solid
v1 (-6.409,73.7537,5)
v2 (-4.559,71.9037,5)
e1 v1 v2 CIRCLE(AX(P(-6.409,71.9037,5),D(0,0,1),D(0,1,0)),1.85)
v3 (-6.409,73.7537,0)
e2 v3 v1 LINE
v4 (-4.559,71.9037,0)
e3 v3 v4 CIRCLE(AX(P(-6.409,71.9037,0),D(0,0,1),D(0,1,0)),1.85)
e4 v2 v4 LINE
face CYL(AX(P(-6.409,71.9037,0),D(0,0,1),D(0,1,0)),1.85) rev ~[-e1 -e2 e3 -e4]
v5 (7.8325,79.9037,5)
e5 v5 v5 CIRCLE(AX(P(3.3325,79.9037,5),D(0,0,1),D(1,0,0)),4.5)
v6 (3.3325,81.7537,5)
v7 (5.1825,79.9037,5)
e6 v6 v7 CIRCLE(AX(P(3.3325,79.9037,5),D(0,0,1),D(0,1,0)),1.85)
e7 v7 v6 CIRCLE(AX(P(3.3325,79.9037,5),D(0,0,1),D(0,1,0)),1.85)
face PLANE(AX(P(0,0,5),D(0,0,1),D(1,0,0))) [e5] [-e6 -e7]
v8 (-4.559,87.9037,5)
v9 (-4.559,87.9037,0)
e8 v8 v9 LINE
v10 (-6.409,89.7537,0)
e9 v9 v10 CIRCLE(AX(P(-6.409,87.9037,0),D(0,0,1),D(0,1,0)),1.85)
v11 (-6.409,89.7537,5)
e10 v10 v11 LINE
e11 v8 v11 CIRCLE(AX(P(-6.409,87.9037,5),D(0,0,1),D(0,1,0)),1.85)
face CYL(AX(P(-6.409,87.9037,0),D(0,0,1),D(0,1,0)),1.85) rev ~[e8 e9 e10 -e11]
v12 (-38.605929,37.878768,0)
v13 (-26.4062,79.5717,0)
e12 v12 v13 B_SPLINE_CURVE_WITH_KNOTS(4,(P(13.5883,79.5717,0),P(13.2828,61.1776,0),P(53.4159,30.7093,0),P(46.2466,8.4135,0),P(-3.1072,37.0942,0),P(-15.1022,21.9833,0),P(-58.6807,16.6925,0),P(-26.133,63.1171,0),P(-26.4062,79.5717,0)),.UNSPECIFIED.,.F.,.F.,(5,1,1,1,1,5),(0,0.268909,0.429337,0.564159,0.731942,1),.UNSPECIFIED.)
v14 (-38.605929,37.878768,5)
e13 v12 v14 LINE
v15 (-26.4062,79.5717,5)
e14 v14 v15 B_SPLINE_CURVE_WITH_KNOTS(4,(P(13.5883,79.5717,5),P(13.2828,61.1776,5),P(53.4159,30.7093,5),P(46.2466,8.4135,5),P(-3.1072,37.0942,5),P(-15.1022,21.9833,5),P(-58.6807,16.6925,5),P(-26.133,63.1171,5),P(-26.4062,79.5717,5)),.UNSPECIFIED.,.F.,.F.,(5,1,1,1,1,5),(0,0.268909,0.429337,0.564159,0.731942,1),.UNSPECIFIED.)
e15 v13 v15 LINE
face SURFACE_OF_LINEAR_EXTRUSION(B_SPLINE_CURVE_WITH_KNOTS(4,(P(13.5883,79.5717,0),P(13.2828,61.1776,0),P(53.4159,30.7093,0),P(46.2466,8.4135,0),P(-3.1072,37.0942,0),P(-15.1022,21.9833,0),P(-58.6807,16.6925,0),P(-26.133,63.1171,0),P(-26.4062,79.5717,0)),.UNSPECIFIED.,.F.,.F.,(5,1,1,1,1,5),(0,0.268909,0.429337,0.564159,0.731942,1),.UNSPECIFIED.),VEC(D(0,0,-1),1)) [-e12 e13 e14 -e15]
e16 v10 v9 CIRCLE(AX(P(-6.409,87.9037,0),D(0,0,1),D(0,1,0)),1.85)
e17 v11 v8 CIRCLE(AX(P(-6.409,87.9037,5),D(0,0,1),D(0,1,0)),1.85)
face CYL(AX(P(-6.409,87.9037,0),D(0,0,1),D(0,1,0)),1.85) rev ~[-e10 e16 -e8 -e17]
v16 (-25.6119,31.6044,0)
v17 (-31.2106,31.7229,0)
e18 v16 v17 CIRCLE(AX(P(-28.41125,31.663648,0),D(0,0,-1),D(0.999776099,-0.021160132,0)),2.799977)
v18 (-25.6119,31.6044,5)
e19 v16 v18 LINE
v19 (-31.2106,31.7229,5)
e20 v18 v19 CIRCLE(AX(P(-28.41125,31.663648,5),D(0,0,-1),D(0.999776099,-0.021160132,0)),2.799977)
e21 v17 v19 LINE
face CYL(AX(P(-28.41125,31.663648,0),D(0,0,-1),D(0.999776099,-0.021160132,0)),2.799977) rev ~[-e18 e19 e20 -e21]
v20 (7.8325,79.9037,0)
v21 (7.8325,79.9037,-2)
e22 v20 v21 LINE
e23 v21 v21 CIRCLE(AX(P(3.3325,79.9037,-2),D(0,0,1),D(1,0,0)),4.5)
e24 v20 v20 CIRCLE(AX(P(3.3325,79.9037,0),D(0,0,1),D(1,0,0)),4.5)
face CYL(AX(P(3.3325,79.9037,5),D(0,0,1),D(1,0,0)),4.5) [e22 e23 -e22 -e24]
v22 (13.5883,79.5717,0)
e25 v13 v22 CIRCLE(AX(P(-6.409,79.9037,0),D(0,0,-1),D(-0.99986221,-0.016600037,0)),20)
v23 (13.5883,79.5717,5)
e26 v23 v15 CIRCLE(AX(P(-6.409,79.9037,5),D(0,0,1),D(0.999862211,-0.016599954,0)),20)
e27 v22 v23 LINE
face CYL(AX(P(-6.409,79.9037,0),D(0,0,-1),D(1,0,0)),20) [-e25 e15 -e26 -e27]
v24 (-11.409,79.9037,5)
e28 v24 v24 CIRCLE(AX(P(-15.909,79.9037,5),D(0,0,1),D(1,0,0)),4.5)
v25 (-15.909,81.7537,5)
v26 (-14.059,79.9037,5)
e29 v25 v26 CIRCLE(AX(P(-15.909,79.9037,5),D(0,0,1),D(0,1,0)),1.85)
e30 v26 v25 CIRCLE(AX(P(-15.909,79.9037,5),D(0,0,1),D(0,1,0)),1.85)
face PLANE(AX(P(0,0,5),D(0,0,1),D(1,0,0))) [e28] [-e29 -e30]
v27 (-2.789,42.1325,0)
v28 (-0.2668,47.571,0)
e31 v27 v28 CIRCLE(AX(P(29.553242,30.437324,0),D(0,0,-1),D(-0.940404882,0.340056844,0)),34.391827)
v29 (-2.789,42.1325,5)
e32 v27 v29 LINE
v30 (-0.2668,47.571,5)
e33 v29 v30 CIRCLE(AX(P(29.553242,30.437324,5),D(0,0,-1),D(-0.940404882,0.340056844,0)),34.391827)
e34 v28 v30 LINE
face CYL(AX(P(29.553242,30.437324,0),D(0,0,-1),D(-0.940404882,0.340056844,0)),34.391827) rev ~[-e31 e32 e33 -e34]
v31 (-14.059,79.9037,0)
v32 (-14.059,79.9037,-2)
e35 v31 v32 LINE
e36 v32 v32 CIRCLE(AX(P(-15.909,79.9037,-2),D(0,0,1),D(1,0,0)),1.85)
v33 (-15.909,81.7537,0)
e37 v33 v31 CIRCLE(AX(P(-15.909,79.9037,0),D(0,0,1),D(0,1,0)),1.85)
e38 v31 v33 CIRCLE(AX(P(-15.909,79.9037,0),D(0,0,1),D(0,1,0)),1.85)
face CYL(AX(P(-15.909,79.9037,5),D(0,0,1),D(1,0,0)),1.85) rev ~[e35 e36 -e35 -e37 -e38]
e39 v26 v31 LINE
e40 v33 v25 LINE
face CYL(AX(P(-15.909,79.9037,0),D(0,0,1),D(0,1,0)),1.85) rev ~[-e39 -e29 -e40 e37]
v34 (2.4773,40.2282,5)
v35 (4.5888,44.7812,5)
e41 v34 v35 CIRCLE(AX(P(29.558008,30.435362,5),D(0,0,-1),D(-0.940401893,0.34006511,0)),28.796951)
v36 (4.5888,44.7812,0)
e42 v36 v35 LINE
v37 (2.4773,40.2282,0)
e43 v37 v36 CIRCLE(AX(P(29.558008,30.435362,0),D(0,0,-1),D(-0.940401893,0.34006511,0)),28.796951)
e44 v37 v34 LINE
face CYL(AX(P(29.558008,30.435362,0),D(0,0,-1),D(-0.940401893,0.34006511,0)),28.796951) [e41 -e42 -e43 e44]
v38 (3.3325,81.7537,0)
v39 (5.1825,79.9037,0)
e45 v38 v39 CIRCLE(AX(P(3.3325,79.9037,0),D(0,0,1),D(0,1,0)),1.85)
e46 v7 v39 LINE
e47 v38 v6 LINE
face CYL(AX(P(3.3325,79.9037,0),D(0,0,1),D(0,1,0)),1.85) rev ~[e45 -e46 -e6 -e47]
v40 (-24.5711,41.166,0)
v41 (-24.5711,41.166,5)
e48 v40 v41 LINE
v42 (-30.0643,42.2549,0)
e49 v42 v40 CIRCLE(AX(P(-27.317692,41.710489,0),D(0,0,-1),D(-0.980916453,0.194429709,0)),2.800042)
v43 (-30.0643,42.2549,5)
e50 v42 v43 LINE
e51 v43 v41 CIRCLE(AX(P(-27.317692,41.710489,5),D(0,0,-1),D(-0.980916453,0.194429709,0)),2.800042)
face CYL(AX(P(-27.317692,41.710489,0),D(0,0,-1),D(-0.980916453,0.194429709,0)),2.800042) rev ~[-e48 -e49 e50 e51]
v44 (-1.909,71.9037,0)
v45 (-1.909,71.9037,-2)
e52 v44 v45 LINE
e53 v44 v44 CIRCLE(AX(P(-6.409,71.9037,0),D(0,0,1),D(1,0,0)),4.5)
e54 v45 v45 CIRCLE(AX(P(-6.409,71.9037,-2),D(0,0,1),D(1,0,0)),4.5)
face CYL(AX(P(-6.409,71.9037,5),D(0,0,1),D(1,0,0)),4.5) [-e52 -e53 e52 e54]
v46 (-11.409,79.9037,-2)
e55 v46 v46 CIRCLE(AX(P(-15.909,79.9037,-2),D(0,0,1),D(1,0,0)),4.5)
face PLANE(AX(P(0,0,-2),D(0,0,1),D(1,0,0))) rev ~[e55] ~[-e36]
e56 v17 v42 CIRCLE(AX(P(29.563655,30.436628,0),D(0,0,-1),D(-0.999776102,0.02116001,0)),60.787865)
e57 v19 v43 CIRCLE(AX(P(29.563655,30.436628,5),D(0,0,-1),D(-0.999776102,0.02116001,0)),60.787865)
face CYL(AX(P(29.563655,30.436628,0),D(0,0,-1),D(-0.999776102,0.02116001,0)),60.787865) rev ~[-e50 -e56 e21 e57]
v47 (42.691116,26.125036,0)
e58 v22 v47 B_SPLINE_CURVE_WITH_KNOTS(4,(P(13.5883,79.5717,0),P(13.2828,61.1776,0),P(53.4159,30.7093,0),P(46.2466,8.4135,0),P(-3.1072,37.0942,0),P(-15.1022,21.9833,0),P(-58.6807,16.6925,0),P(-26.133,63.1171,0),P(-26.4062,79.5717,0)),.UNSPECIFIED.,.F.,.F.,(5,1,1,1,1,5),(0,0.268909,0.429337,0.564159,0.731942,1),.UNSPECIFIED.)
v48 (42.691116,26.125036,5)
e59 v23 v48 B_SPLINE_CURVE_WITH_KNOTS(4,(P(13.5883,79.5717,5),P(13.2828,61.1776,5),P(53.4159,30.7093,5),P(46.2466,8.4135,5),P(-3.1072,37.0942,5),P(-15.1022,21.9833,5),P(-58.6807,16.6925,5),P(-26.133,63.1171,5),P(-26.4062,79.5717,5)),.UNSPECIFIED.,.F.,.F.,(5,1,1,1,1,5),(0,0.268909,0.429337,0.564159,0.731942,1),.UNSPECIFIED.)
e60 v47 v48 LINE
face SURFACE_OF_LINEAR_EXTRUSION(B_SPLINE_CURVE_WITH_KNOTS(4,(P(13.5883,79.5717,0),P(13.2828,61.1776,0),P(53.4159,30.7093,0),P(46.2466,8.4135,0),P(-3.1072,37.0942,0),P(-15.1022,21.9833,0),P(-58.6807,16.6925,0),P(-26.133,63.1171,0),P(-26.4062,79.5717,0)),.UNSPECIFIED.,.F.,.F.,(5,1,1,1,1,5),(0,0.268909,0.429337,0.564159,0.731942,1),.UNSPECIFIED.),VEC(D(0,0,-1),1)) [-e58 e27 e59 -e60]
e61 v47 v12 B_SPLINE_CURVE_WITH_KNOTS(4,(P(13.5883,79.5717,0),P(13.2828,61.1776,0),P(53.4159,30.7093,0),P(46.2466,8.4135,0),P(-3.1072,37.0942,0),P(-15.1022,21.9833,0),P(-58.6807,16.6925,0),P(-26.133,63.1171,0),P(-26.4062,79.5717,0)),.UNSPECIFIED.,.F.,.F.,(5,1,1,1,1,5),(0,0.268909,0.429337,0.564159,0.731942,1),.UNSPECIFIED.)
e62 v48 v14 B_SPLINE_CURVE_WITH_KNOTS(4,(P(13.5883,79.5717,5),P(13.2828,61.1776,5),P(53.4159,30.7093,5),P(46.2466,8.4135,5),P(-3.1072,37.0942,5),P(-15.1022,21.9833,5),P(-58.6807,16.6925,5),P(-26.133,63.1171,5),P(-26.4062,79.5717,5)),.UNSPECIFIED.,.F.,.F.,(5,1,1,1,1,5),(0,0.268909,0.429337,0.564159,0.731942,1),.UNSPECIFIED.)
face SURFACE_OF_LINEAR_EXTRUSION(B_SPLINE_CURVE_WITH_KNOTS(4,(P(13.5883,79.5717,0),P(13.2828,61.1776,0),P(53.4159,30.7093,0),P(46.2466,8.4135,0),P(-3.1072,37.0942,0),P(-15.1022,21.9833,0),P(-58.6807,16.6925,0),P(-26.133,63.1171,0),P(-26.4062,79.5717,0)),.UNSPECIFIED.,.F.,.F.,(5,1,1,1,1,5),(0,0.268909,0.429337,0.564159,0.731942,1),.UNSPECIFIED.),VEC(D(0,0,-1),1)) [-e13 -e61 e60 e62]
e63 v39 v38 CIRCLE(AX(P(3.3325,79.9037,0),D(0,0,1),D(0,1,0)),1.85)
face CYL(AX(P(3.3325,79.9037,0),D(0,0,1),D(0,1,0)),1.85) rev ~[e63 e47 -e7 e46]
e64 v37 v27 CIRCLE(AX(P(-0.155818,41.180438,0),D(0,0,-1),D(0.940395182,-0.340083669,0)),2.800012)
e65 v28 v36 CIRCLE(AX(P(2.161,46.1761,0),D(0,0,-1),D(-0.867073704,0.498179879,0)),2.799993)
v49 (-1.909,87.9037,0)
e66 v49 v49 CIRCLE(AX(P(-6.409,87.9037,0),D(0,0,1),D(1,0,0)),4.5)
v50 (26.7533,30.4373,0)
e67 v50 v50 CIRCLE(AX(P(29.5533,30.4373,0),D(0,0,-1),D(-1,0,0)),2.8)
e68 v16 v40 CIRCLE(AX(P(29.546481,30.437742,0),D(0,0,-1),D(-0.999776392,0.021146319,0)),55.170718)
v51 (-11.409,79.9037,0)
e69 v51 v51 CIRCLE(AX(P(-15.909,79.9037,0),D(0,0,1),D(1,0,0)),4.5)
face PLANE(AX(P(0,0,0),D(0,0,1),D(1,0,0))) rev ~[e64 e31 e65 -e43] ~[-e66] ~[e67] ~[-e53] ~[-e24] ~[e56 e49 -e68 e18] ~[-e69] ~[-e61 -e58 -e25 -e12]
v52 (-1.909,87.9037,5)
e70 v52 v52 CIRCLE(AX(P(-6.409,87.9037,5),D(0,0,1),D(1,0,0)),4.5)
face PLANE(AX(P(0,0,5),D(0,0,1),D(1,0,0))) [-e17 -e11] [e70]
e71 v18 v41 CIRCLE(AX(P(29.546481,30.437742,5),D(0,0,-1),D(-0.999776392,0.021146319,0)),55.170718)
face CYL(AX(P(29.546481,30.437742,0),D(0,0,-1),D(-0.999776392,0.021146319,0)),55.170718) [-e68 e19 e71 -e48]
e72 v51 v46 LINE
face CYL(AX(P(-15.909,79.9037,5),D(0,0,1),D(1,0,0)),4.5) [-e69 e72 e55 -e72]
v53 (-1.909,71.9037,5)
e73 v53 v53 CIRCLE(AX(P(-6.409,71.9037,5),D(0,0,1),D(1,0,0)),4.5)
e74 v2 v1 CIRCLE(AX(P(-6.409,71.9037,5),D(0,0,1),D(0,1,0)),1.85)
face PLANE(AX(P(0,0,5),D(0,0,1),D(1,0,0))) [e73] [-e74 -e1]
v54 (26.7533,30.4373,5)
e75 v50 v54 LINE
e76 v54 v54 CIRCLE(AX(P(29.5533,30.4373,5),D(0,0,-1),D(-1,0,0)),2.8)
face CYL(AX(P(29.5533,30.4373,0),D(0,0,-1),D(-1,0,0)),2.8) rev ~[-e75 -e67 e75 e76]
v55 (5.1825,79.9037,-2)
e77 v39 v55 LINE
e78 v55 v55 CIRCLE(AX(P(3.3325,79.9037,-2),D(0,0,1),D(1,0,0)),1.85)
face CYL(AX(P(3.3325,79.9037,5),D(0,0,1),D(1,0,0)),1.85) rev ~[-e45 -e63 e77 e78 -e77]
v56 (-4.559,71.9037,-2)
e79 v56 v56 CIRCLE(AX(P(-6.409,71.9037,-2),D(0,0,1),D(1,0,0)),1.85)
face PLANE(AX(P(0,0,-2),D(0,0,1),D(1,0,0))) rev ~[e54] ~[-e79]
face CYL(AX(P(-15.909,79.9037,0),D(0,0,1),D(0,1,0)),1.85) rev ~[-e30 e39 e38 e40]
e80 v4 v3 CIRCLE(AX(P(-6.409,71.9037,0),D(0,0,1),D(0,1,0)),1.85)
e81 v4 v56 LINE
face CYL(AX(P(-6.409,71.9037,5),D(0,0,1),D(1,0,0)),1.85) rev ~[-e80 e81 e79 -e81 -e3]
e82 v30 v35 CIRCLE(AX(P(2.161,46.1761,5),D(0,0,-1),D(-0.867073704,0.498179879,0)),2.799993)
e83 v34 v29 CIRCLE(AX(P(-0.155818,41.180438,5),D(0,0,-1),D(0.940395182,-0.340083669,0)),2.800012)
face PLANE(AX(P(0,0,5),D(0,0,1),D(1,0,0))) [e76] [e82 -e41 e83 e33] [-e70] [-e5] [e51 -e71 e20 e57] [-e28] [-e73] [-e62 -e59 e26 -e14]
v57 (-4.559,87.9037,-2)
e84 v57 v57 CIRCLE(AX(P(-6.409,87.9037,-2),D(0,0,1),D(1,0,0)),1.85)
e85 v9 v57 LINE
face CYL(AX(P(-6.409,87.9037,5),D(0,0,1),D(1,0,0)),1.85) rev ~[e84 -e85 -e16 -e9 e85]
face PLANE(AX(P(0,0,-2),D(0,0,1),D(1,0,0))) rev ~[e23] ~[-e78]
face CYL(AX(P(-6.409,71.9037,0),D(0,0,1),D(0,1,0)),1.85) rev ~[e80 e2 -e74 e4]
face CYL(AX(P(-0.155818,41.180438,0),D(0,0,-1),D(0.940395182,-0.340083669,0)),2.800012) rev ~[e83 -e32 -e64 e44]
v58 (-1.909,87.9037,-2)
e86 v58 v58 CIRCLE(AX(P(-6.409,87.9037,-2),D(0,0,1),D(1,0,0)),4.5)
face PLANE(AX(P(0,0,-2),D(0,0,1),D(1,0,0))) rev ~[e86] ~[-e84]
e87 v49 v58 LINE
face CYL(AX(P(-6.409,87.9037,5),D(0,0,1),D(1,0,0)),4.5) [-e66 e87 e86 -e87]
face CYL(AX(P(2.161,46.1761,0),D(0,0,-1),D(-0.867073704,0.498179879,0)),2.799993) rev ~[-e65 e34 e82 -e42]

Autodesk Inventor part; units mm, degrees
ref_plane "YZ Plane" through (0, 0, 0) normal (1, 0, 0) x (0, 1, 0)
ref_plane "XZ Plane" through (0, 0, 0) normal (0, 1, 0) x (-1, 0, 0)
ref_plane "XY Plane" through (0, 0, 0) normal (0, 0, 1) x (1, 0, 0)
sketch "Sketch1" plane through (0, 0, 0) normal (0, 0, 1) x (1, 0, 0)
  circle A0 centre (-25.0838, -31.7051) radius 2.5 projected
  circle A1 centre (-43.012, -13.2629) radius 2.5 projected
  circle A2 centre (-44.8914, 13.7567) radius 2.5 projected
  circle A3 centre (-28.0838, 36.7109) radius 2.5 construction
  circle A4 centre (0.8935, 43.7288) radius 2.5 construction
  circle A5 centre (29.5533, 30.4373) radius 2.5 projected
  circle A6 centre (43.6662, -0.0951) radius 2.5 projected
  circle A7 centre (47.6662, -52.5951) radius 2.5 projected
  circle A8 centre (10.6662, -52.5951) radius 2.5 projected
  circle A9 centre (-6.8338, -0.0951) radius 8.75 projected
  line L0 (56.6662, -60.0951) -> (51.1662, -0.0951) projected
  spline S0 degree 4 poles (51.1662, -0.0951) (50.0319, 24.6801) (26.25, 55.8136) (-25.1104, 60.0951) (-56.6662, 18.5311) (-54.7055, -22.2338) (-29.645, -43.1708) (-8.3823, -44.3792) (3.1662, -40.8213) knots 0 0 0 0 0 0.330099 0.457579 0.582312 0.704438 0.895347 0.895347 0.895347 0.895347 0.895347 projected
  line L1 (3.1662, -40.8213) -> (3.1662, -60.0951) projected
  line L2 (3.1662, -60.0951) -> (56.6662, -60.0951) projected
  circle A10 centre (-6.8338, -0.0951) radius 80 construction
  circle A11 centre (-6.409, 79.9037) radius 20
  spline S1 degree 4 poles (13.5883, 79.5717) (13.2828, 61.1776) (53.4159, 30.7093) (46.2466, 8.4135) (-3.1072, 37.0942) (-15.1022, 21.9833) (-58.6807, 16.6925) (-26.133, 63.1171) (-26.4062, 79.5717) knots 0 0 0 0 0 0.268909 0.429337 0.564159 0.731942 1 1 1 1 1
  arc A12 (2.161, 46.1761) -> (-0.1558, 41.1804) centre (29.5533, 30.4373) ccw
  arc A13 (-27.3177, 41.7105) -> (-28.4113, 31.6637) centre (29.5533, 30.4373) ccw
  line L3 (29.5533, 30.4373) -> (-27.3177, 41.7105) construction
  line L4 (-28.0838, 36.7109) -> (29.5533, 30.4373) construction
  line L5 (2.161, 46.1761) -> (29.5533, 30.4373) construction
  line L6 (-0.1558, 41.1804) -> (29.5533, 30.4373) construction
  line L7 (0.8935, 43.7288) -> (29.5533, 30.4373) construction
  line L8 (-28.4113, 31.6637) -> (29.5533, 30.4373) construction
  arc A14 (-30.9107, 31.7166) -> (-25.9118, 31.6108) centre (-28.4113, 31.6637) ccw
  arc A15 (-24.8654, 41.2244) -> (-29.77, 42.1966) centre (-27.3177, 41.7105) ccw
  arc A16 (4.3287, 44.9306) -> (-0.0066, 47.4216) centre (2.161, 46.1761) ccw
  arc A17 (-2.5068, 42.0305) -> (2.1952, 40.3302) centre (-0.1558, 41.1804) ccw
  arc A18 (-0.0066, 47.4216) -> (-2.5068, 42.0305) centre (29.5533, 30.4373) ccw
  arc A19 (4.3287, 44.9306) -> (2.1952, 40.3302) centre (29.5533, 30.4373) ccw
  arc A20 (-29.77, 42.1966) -> (-30.9118, 31.6637) centre (29.5533, 30.4373) ccw
  arc A21 (-24.8654, 41.2244) -> (-25.9118, 31.6108) centre (29.5533, 30.4373) ccw
  point P0 (0, 0)
  point P1 (42.6911, 26.1251)
  point P2 (35.4649, 20.4441)
  point P3 (1.223, 30.0999)
  point P4 (-17.2039, 26.1779)
  point P5 (-36.803, 26.1853)
  dimension "d0" = 160
  dimension "d1" = 40
  dimension "d4" = 5
  dimension "d5" = 5
  dimension "d6" = 5
  dimension "d7" = 5
  dimension "d8" = 5
  dimension "d9" = 5
  dimension "d10" = 5
  dimension "d11" = 5
ref_plane "Work Plane1" through (0, 0, 5) normal (0, 0, 1) x (1, 0, 0)
extrude "Extrusion2" add sketch "Sketch1" along normal blind 5 contours S1 S0 | S0 S1 A11 | A11
sketch "Sketch3" plane through (0, 0, 0) normal (0, 0, -1) x (-1, 0, 0)
  circle A0 centre (6.409, 79.9037) radius 20 projected
  circle A1 centre (6.409, 79.9037) radius 8 construction
  circle A2 centre (6.409, 79.9037) radius 9.5 construction
  point P0 (0, 0)
  point P1 (15.909, 79.9037)
  point P2 (6.409, 71.9037)
  point P3 (-3.3325, 79.9037)
  point P4 (6.409, 87.9037)
  dimension "d16" = 19
  dimension "d15" = 16
hole "Hole1" at (-15.909, 79.9037, 0) at (-6.409, 71.9037, 0) at (3.3325, 79.9037, 0) at (-6.409, 87.9037, 0) direction (0, 0, 1) diameter 3.7 end through all
sketch "Sketch4" plane through (0, 0, 5) normal (0, 0, 1) x (1, 0, 0)
  circle A0 centre (3.3325, 79.9037) radius 1.85 projected
  circle A1 centre (-6.409, 71.9037) radius 1.85 projected
  circle A2 centre (-15.909, 79.9037) radius 1.85 projected
  circle A3 centre (-6.409, 87.9037) radius 1.85 projected
  circle A4 centre (3.3325, 79.9037) radius 4.5
  circle A5 centre (-6.409, 71.9037) radius 4.5
  circle A6 centre (-15.909, 79.9037) radius 4.5
  circle A7 centre (-6.409, 87.9037) radius 4.5
  point P0 (0, 0)
  dimension "d24" = 9
  dimension "d25" = 9
  dimension "d26" = 9
  dimension "d27" = 9
extrude "Extrusion3" add sketch "Sketch4" against normal blind 7
sketch "Sketch5" plane through (0, 0, 0) normal (0, 0, -1) x (-1, 0, 0)
  circle A0 centre (-3.3325, 79.9037) radius 4.5 projected
  circle A1 centre (6.409, 71.9037) radius 4.5 projected
  circle A2 centre (6.409, 87.9037) radius 4.5 projected
  circle A3 centre (15.909, 79.9037) radius 4.5 projected
  arc A4 (26.4062, 79.5717) -> (-13.5883, 79.5717) centre (6.409, 79.9037) ccw projected
  arc A5 (25.9118, 31.6108) -> (24.8654, 41.2244) centre (-29.5533, 30.4373) ccw projected
  arc A6 (29.77, 42.1966) -> (24.8654, 41.2244) centre (27.3177, 41.7105) ccw projected
  arc A7 (30.9107, 31.7166) -> (29.77, 42.1966) centre (-29.5533, 30.4373) ccw projected
  arc A8 (25.9118, 31.6108) -> (30.9107, 31.7166) centre (28.4113, 31.6637) ccw projected
  circle A9 centre (-29.5533, 30.4373) radius 2.5 projected
  arc A10 (-2.1952, 40.3302) -> (-4.3287, 44.9306) centre (-29.5533, 30.4373) ccw projected
  arc A11 (0.0066, 47.4216) -> (-4.3287, 44.9306) centre (-2.161, 46.1761) ccw projected
  arc A12 (2.5068, 42.0305) -> (0.0066, 47.4216) centre (-29.5533, 30.4373) ccw projected
  arc A13 (-2.1952, 40.3302) -> (2.5068, 42.0305) centre (0.1558, 41.1804) ccw projected
  circle A14 centre (-29.5533, 30.4373) radius 2.8
  arc A15 (-2.4773, 40.2282) -> (-4.5888, 44.7812) centre (-29.5533, 30.4373) ccw
  arc A16 (-2.4773, 40.2282) -> (2.789, 42.1325) centre (0.1558, 41.1804) ccw
  arc A17 (2.789, 42.1325) -> (0.2668, 47.571) centre (-29.5533, 30.4373) ccw
  arc A18 (0.2668, 47.571) -> (-4.5888, 44.7812) centre (-2.161, 46.1761) ccw
  arc A19 (25.6119, 31.6044) -> (24.5711, 41.166) centre (-29.5533, 30.4373) ccw
  arc A20 (25.6119, 31.6044) -> (31.2106, 31.7229) centre (28.4113, 31.6637) ccw
  arc A21 (31.2106, 31.7229) -> (30.0643, 42.2549) centre (-29.5533, 30.4373) ccw
  arc A22 (30.0643, 42.2549) -> (24.5711, 41.166) centre (27.3177, 41.7105) ccw
  point P0 (0, 0)
  dimension "d30" = 0.3
  dimension "d31" = 0.3
  dimension "d32" = 0.3
extrude "Extrusion4" cut sketch "Sketch5" against normal blind 7 contours A14 | A15 A18 A17 A16 | A19 A22 A21 A20
properties part number "Soporte motor"
